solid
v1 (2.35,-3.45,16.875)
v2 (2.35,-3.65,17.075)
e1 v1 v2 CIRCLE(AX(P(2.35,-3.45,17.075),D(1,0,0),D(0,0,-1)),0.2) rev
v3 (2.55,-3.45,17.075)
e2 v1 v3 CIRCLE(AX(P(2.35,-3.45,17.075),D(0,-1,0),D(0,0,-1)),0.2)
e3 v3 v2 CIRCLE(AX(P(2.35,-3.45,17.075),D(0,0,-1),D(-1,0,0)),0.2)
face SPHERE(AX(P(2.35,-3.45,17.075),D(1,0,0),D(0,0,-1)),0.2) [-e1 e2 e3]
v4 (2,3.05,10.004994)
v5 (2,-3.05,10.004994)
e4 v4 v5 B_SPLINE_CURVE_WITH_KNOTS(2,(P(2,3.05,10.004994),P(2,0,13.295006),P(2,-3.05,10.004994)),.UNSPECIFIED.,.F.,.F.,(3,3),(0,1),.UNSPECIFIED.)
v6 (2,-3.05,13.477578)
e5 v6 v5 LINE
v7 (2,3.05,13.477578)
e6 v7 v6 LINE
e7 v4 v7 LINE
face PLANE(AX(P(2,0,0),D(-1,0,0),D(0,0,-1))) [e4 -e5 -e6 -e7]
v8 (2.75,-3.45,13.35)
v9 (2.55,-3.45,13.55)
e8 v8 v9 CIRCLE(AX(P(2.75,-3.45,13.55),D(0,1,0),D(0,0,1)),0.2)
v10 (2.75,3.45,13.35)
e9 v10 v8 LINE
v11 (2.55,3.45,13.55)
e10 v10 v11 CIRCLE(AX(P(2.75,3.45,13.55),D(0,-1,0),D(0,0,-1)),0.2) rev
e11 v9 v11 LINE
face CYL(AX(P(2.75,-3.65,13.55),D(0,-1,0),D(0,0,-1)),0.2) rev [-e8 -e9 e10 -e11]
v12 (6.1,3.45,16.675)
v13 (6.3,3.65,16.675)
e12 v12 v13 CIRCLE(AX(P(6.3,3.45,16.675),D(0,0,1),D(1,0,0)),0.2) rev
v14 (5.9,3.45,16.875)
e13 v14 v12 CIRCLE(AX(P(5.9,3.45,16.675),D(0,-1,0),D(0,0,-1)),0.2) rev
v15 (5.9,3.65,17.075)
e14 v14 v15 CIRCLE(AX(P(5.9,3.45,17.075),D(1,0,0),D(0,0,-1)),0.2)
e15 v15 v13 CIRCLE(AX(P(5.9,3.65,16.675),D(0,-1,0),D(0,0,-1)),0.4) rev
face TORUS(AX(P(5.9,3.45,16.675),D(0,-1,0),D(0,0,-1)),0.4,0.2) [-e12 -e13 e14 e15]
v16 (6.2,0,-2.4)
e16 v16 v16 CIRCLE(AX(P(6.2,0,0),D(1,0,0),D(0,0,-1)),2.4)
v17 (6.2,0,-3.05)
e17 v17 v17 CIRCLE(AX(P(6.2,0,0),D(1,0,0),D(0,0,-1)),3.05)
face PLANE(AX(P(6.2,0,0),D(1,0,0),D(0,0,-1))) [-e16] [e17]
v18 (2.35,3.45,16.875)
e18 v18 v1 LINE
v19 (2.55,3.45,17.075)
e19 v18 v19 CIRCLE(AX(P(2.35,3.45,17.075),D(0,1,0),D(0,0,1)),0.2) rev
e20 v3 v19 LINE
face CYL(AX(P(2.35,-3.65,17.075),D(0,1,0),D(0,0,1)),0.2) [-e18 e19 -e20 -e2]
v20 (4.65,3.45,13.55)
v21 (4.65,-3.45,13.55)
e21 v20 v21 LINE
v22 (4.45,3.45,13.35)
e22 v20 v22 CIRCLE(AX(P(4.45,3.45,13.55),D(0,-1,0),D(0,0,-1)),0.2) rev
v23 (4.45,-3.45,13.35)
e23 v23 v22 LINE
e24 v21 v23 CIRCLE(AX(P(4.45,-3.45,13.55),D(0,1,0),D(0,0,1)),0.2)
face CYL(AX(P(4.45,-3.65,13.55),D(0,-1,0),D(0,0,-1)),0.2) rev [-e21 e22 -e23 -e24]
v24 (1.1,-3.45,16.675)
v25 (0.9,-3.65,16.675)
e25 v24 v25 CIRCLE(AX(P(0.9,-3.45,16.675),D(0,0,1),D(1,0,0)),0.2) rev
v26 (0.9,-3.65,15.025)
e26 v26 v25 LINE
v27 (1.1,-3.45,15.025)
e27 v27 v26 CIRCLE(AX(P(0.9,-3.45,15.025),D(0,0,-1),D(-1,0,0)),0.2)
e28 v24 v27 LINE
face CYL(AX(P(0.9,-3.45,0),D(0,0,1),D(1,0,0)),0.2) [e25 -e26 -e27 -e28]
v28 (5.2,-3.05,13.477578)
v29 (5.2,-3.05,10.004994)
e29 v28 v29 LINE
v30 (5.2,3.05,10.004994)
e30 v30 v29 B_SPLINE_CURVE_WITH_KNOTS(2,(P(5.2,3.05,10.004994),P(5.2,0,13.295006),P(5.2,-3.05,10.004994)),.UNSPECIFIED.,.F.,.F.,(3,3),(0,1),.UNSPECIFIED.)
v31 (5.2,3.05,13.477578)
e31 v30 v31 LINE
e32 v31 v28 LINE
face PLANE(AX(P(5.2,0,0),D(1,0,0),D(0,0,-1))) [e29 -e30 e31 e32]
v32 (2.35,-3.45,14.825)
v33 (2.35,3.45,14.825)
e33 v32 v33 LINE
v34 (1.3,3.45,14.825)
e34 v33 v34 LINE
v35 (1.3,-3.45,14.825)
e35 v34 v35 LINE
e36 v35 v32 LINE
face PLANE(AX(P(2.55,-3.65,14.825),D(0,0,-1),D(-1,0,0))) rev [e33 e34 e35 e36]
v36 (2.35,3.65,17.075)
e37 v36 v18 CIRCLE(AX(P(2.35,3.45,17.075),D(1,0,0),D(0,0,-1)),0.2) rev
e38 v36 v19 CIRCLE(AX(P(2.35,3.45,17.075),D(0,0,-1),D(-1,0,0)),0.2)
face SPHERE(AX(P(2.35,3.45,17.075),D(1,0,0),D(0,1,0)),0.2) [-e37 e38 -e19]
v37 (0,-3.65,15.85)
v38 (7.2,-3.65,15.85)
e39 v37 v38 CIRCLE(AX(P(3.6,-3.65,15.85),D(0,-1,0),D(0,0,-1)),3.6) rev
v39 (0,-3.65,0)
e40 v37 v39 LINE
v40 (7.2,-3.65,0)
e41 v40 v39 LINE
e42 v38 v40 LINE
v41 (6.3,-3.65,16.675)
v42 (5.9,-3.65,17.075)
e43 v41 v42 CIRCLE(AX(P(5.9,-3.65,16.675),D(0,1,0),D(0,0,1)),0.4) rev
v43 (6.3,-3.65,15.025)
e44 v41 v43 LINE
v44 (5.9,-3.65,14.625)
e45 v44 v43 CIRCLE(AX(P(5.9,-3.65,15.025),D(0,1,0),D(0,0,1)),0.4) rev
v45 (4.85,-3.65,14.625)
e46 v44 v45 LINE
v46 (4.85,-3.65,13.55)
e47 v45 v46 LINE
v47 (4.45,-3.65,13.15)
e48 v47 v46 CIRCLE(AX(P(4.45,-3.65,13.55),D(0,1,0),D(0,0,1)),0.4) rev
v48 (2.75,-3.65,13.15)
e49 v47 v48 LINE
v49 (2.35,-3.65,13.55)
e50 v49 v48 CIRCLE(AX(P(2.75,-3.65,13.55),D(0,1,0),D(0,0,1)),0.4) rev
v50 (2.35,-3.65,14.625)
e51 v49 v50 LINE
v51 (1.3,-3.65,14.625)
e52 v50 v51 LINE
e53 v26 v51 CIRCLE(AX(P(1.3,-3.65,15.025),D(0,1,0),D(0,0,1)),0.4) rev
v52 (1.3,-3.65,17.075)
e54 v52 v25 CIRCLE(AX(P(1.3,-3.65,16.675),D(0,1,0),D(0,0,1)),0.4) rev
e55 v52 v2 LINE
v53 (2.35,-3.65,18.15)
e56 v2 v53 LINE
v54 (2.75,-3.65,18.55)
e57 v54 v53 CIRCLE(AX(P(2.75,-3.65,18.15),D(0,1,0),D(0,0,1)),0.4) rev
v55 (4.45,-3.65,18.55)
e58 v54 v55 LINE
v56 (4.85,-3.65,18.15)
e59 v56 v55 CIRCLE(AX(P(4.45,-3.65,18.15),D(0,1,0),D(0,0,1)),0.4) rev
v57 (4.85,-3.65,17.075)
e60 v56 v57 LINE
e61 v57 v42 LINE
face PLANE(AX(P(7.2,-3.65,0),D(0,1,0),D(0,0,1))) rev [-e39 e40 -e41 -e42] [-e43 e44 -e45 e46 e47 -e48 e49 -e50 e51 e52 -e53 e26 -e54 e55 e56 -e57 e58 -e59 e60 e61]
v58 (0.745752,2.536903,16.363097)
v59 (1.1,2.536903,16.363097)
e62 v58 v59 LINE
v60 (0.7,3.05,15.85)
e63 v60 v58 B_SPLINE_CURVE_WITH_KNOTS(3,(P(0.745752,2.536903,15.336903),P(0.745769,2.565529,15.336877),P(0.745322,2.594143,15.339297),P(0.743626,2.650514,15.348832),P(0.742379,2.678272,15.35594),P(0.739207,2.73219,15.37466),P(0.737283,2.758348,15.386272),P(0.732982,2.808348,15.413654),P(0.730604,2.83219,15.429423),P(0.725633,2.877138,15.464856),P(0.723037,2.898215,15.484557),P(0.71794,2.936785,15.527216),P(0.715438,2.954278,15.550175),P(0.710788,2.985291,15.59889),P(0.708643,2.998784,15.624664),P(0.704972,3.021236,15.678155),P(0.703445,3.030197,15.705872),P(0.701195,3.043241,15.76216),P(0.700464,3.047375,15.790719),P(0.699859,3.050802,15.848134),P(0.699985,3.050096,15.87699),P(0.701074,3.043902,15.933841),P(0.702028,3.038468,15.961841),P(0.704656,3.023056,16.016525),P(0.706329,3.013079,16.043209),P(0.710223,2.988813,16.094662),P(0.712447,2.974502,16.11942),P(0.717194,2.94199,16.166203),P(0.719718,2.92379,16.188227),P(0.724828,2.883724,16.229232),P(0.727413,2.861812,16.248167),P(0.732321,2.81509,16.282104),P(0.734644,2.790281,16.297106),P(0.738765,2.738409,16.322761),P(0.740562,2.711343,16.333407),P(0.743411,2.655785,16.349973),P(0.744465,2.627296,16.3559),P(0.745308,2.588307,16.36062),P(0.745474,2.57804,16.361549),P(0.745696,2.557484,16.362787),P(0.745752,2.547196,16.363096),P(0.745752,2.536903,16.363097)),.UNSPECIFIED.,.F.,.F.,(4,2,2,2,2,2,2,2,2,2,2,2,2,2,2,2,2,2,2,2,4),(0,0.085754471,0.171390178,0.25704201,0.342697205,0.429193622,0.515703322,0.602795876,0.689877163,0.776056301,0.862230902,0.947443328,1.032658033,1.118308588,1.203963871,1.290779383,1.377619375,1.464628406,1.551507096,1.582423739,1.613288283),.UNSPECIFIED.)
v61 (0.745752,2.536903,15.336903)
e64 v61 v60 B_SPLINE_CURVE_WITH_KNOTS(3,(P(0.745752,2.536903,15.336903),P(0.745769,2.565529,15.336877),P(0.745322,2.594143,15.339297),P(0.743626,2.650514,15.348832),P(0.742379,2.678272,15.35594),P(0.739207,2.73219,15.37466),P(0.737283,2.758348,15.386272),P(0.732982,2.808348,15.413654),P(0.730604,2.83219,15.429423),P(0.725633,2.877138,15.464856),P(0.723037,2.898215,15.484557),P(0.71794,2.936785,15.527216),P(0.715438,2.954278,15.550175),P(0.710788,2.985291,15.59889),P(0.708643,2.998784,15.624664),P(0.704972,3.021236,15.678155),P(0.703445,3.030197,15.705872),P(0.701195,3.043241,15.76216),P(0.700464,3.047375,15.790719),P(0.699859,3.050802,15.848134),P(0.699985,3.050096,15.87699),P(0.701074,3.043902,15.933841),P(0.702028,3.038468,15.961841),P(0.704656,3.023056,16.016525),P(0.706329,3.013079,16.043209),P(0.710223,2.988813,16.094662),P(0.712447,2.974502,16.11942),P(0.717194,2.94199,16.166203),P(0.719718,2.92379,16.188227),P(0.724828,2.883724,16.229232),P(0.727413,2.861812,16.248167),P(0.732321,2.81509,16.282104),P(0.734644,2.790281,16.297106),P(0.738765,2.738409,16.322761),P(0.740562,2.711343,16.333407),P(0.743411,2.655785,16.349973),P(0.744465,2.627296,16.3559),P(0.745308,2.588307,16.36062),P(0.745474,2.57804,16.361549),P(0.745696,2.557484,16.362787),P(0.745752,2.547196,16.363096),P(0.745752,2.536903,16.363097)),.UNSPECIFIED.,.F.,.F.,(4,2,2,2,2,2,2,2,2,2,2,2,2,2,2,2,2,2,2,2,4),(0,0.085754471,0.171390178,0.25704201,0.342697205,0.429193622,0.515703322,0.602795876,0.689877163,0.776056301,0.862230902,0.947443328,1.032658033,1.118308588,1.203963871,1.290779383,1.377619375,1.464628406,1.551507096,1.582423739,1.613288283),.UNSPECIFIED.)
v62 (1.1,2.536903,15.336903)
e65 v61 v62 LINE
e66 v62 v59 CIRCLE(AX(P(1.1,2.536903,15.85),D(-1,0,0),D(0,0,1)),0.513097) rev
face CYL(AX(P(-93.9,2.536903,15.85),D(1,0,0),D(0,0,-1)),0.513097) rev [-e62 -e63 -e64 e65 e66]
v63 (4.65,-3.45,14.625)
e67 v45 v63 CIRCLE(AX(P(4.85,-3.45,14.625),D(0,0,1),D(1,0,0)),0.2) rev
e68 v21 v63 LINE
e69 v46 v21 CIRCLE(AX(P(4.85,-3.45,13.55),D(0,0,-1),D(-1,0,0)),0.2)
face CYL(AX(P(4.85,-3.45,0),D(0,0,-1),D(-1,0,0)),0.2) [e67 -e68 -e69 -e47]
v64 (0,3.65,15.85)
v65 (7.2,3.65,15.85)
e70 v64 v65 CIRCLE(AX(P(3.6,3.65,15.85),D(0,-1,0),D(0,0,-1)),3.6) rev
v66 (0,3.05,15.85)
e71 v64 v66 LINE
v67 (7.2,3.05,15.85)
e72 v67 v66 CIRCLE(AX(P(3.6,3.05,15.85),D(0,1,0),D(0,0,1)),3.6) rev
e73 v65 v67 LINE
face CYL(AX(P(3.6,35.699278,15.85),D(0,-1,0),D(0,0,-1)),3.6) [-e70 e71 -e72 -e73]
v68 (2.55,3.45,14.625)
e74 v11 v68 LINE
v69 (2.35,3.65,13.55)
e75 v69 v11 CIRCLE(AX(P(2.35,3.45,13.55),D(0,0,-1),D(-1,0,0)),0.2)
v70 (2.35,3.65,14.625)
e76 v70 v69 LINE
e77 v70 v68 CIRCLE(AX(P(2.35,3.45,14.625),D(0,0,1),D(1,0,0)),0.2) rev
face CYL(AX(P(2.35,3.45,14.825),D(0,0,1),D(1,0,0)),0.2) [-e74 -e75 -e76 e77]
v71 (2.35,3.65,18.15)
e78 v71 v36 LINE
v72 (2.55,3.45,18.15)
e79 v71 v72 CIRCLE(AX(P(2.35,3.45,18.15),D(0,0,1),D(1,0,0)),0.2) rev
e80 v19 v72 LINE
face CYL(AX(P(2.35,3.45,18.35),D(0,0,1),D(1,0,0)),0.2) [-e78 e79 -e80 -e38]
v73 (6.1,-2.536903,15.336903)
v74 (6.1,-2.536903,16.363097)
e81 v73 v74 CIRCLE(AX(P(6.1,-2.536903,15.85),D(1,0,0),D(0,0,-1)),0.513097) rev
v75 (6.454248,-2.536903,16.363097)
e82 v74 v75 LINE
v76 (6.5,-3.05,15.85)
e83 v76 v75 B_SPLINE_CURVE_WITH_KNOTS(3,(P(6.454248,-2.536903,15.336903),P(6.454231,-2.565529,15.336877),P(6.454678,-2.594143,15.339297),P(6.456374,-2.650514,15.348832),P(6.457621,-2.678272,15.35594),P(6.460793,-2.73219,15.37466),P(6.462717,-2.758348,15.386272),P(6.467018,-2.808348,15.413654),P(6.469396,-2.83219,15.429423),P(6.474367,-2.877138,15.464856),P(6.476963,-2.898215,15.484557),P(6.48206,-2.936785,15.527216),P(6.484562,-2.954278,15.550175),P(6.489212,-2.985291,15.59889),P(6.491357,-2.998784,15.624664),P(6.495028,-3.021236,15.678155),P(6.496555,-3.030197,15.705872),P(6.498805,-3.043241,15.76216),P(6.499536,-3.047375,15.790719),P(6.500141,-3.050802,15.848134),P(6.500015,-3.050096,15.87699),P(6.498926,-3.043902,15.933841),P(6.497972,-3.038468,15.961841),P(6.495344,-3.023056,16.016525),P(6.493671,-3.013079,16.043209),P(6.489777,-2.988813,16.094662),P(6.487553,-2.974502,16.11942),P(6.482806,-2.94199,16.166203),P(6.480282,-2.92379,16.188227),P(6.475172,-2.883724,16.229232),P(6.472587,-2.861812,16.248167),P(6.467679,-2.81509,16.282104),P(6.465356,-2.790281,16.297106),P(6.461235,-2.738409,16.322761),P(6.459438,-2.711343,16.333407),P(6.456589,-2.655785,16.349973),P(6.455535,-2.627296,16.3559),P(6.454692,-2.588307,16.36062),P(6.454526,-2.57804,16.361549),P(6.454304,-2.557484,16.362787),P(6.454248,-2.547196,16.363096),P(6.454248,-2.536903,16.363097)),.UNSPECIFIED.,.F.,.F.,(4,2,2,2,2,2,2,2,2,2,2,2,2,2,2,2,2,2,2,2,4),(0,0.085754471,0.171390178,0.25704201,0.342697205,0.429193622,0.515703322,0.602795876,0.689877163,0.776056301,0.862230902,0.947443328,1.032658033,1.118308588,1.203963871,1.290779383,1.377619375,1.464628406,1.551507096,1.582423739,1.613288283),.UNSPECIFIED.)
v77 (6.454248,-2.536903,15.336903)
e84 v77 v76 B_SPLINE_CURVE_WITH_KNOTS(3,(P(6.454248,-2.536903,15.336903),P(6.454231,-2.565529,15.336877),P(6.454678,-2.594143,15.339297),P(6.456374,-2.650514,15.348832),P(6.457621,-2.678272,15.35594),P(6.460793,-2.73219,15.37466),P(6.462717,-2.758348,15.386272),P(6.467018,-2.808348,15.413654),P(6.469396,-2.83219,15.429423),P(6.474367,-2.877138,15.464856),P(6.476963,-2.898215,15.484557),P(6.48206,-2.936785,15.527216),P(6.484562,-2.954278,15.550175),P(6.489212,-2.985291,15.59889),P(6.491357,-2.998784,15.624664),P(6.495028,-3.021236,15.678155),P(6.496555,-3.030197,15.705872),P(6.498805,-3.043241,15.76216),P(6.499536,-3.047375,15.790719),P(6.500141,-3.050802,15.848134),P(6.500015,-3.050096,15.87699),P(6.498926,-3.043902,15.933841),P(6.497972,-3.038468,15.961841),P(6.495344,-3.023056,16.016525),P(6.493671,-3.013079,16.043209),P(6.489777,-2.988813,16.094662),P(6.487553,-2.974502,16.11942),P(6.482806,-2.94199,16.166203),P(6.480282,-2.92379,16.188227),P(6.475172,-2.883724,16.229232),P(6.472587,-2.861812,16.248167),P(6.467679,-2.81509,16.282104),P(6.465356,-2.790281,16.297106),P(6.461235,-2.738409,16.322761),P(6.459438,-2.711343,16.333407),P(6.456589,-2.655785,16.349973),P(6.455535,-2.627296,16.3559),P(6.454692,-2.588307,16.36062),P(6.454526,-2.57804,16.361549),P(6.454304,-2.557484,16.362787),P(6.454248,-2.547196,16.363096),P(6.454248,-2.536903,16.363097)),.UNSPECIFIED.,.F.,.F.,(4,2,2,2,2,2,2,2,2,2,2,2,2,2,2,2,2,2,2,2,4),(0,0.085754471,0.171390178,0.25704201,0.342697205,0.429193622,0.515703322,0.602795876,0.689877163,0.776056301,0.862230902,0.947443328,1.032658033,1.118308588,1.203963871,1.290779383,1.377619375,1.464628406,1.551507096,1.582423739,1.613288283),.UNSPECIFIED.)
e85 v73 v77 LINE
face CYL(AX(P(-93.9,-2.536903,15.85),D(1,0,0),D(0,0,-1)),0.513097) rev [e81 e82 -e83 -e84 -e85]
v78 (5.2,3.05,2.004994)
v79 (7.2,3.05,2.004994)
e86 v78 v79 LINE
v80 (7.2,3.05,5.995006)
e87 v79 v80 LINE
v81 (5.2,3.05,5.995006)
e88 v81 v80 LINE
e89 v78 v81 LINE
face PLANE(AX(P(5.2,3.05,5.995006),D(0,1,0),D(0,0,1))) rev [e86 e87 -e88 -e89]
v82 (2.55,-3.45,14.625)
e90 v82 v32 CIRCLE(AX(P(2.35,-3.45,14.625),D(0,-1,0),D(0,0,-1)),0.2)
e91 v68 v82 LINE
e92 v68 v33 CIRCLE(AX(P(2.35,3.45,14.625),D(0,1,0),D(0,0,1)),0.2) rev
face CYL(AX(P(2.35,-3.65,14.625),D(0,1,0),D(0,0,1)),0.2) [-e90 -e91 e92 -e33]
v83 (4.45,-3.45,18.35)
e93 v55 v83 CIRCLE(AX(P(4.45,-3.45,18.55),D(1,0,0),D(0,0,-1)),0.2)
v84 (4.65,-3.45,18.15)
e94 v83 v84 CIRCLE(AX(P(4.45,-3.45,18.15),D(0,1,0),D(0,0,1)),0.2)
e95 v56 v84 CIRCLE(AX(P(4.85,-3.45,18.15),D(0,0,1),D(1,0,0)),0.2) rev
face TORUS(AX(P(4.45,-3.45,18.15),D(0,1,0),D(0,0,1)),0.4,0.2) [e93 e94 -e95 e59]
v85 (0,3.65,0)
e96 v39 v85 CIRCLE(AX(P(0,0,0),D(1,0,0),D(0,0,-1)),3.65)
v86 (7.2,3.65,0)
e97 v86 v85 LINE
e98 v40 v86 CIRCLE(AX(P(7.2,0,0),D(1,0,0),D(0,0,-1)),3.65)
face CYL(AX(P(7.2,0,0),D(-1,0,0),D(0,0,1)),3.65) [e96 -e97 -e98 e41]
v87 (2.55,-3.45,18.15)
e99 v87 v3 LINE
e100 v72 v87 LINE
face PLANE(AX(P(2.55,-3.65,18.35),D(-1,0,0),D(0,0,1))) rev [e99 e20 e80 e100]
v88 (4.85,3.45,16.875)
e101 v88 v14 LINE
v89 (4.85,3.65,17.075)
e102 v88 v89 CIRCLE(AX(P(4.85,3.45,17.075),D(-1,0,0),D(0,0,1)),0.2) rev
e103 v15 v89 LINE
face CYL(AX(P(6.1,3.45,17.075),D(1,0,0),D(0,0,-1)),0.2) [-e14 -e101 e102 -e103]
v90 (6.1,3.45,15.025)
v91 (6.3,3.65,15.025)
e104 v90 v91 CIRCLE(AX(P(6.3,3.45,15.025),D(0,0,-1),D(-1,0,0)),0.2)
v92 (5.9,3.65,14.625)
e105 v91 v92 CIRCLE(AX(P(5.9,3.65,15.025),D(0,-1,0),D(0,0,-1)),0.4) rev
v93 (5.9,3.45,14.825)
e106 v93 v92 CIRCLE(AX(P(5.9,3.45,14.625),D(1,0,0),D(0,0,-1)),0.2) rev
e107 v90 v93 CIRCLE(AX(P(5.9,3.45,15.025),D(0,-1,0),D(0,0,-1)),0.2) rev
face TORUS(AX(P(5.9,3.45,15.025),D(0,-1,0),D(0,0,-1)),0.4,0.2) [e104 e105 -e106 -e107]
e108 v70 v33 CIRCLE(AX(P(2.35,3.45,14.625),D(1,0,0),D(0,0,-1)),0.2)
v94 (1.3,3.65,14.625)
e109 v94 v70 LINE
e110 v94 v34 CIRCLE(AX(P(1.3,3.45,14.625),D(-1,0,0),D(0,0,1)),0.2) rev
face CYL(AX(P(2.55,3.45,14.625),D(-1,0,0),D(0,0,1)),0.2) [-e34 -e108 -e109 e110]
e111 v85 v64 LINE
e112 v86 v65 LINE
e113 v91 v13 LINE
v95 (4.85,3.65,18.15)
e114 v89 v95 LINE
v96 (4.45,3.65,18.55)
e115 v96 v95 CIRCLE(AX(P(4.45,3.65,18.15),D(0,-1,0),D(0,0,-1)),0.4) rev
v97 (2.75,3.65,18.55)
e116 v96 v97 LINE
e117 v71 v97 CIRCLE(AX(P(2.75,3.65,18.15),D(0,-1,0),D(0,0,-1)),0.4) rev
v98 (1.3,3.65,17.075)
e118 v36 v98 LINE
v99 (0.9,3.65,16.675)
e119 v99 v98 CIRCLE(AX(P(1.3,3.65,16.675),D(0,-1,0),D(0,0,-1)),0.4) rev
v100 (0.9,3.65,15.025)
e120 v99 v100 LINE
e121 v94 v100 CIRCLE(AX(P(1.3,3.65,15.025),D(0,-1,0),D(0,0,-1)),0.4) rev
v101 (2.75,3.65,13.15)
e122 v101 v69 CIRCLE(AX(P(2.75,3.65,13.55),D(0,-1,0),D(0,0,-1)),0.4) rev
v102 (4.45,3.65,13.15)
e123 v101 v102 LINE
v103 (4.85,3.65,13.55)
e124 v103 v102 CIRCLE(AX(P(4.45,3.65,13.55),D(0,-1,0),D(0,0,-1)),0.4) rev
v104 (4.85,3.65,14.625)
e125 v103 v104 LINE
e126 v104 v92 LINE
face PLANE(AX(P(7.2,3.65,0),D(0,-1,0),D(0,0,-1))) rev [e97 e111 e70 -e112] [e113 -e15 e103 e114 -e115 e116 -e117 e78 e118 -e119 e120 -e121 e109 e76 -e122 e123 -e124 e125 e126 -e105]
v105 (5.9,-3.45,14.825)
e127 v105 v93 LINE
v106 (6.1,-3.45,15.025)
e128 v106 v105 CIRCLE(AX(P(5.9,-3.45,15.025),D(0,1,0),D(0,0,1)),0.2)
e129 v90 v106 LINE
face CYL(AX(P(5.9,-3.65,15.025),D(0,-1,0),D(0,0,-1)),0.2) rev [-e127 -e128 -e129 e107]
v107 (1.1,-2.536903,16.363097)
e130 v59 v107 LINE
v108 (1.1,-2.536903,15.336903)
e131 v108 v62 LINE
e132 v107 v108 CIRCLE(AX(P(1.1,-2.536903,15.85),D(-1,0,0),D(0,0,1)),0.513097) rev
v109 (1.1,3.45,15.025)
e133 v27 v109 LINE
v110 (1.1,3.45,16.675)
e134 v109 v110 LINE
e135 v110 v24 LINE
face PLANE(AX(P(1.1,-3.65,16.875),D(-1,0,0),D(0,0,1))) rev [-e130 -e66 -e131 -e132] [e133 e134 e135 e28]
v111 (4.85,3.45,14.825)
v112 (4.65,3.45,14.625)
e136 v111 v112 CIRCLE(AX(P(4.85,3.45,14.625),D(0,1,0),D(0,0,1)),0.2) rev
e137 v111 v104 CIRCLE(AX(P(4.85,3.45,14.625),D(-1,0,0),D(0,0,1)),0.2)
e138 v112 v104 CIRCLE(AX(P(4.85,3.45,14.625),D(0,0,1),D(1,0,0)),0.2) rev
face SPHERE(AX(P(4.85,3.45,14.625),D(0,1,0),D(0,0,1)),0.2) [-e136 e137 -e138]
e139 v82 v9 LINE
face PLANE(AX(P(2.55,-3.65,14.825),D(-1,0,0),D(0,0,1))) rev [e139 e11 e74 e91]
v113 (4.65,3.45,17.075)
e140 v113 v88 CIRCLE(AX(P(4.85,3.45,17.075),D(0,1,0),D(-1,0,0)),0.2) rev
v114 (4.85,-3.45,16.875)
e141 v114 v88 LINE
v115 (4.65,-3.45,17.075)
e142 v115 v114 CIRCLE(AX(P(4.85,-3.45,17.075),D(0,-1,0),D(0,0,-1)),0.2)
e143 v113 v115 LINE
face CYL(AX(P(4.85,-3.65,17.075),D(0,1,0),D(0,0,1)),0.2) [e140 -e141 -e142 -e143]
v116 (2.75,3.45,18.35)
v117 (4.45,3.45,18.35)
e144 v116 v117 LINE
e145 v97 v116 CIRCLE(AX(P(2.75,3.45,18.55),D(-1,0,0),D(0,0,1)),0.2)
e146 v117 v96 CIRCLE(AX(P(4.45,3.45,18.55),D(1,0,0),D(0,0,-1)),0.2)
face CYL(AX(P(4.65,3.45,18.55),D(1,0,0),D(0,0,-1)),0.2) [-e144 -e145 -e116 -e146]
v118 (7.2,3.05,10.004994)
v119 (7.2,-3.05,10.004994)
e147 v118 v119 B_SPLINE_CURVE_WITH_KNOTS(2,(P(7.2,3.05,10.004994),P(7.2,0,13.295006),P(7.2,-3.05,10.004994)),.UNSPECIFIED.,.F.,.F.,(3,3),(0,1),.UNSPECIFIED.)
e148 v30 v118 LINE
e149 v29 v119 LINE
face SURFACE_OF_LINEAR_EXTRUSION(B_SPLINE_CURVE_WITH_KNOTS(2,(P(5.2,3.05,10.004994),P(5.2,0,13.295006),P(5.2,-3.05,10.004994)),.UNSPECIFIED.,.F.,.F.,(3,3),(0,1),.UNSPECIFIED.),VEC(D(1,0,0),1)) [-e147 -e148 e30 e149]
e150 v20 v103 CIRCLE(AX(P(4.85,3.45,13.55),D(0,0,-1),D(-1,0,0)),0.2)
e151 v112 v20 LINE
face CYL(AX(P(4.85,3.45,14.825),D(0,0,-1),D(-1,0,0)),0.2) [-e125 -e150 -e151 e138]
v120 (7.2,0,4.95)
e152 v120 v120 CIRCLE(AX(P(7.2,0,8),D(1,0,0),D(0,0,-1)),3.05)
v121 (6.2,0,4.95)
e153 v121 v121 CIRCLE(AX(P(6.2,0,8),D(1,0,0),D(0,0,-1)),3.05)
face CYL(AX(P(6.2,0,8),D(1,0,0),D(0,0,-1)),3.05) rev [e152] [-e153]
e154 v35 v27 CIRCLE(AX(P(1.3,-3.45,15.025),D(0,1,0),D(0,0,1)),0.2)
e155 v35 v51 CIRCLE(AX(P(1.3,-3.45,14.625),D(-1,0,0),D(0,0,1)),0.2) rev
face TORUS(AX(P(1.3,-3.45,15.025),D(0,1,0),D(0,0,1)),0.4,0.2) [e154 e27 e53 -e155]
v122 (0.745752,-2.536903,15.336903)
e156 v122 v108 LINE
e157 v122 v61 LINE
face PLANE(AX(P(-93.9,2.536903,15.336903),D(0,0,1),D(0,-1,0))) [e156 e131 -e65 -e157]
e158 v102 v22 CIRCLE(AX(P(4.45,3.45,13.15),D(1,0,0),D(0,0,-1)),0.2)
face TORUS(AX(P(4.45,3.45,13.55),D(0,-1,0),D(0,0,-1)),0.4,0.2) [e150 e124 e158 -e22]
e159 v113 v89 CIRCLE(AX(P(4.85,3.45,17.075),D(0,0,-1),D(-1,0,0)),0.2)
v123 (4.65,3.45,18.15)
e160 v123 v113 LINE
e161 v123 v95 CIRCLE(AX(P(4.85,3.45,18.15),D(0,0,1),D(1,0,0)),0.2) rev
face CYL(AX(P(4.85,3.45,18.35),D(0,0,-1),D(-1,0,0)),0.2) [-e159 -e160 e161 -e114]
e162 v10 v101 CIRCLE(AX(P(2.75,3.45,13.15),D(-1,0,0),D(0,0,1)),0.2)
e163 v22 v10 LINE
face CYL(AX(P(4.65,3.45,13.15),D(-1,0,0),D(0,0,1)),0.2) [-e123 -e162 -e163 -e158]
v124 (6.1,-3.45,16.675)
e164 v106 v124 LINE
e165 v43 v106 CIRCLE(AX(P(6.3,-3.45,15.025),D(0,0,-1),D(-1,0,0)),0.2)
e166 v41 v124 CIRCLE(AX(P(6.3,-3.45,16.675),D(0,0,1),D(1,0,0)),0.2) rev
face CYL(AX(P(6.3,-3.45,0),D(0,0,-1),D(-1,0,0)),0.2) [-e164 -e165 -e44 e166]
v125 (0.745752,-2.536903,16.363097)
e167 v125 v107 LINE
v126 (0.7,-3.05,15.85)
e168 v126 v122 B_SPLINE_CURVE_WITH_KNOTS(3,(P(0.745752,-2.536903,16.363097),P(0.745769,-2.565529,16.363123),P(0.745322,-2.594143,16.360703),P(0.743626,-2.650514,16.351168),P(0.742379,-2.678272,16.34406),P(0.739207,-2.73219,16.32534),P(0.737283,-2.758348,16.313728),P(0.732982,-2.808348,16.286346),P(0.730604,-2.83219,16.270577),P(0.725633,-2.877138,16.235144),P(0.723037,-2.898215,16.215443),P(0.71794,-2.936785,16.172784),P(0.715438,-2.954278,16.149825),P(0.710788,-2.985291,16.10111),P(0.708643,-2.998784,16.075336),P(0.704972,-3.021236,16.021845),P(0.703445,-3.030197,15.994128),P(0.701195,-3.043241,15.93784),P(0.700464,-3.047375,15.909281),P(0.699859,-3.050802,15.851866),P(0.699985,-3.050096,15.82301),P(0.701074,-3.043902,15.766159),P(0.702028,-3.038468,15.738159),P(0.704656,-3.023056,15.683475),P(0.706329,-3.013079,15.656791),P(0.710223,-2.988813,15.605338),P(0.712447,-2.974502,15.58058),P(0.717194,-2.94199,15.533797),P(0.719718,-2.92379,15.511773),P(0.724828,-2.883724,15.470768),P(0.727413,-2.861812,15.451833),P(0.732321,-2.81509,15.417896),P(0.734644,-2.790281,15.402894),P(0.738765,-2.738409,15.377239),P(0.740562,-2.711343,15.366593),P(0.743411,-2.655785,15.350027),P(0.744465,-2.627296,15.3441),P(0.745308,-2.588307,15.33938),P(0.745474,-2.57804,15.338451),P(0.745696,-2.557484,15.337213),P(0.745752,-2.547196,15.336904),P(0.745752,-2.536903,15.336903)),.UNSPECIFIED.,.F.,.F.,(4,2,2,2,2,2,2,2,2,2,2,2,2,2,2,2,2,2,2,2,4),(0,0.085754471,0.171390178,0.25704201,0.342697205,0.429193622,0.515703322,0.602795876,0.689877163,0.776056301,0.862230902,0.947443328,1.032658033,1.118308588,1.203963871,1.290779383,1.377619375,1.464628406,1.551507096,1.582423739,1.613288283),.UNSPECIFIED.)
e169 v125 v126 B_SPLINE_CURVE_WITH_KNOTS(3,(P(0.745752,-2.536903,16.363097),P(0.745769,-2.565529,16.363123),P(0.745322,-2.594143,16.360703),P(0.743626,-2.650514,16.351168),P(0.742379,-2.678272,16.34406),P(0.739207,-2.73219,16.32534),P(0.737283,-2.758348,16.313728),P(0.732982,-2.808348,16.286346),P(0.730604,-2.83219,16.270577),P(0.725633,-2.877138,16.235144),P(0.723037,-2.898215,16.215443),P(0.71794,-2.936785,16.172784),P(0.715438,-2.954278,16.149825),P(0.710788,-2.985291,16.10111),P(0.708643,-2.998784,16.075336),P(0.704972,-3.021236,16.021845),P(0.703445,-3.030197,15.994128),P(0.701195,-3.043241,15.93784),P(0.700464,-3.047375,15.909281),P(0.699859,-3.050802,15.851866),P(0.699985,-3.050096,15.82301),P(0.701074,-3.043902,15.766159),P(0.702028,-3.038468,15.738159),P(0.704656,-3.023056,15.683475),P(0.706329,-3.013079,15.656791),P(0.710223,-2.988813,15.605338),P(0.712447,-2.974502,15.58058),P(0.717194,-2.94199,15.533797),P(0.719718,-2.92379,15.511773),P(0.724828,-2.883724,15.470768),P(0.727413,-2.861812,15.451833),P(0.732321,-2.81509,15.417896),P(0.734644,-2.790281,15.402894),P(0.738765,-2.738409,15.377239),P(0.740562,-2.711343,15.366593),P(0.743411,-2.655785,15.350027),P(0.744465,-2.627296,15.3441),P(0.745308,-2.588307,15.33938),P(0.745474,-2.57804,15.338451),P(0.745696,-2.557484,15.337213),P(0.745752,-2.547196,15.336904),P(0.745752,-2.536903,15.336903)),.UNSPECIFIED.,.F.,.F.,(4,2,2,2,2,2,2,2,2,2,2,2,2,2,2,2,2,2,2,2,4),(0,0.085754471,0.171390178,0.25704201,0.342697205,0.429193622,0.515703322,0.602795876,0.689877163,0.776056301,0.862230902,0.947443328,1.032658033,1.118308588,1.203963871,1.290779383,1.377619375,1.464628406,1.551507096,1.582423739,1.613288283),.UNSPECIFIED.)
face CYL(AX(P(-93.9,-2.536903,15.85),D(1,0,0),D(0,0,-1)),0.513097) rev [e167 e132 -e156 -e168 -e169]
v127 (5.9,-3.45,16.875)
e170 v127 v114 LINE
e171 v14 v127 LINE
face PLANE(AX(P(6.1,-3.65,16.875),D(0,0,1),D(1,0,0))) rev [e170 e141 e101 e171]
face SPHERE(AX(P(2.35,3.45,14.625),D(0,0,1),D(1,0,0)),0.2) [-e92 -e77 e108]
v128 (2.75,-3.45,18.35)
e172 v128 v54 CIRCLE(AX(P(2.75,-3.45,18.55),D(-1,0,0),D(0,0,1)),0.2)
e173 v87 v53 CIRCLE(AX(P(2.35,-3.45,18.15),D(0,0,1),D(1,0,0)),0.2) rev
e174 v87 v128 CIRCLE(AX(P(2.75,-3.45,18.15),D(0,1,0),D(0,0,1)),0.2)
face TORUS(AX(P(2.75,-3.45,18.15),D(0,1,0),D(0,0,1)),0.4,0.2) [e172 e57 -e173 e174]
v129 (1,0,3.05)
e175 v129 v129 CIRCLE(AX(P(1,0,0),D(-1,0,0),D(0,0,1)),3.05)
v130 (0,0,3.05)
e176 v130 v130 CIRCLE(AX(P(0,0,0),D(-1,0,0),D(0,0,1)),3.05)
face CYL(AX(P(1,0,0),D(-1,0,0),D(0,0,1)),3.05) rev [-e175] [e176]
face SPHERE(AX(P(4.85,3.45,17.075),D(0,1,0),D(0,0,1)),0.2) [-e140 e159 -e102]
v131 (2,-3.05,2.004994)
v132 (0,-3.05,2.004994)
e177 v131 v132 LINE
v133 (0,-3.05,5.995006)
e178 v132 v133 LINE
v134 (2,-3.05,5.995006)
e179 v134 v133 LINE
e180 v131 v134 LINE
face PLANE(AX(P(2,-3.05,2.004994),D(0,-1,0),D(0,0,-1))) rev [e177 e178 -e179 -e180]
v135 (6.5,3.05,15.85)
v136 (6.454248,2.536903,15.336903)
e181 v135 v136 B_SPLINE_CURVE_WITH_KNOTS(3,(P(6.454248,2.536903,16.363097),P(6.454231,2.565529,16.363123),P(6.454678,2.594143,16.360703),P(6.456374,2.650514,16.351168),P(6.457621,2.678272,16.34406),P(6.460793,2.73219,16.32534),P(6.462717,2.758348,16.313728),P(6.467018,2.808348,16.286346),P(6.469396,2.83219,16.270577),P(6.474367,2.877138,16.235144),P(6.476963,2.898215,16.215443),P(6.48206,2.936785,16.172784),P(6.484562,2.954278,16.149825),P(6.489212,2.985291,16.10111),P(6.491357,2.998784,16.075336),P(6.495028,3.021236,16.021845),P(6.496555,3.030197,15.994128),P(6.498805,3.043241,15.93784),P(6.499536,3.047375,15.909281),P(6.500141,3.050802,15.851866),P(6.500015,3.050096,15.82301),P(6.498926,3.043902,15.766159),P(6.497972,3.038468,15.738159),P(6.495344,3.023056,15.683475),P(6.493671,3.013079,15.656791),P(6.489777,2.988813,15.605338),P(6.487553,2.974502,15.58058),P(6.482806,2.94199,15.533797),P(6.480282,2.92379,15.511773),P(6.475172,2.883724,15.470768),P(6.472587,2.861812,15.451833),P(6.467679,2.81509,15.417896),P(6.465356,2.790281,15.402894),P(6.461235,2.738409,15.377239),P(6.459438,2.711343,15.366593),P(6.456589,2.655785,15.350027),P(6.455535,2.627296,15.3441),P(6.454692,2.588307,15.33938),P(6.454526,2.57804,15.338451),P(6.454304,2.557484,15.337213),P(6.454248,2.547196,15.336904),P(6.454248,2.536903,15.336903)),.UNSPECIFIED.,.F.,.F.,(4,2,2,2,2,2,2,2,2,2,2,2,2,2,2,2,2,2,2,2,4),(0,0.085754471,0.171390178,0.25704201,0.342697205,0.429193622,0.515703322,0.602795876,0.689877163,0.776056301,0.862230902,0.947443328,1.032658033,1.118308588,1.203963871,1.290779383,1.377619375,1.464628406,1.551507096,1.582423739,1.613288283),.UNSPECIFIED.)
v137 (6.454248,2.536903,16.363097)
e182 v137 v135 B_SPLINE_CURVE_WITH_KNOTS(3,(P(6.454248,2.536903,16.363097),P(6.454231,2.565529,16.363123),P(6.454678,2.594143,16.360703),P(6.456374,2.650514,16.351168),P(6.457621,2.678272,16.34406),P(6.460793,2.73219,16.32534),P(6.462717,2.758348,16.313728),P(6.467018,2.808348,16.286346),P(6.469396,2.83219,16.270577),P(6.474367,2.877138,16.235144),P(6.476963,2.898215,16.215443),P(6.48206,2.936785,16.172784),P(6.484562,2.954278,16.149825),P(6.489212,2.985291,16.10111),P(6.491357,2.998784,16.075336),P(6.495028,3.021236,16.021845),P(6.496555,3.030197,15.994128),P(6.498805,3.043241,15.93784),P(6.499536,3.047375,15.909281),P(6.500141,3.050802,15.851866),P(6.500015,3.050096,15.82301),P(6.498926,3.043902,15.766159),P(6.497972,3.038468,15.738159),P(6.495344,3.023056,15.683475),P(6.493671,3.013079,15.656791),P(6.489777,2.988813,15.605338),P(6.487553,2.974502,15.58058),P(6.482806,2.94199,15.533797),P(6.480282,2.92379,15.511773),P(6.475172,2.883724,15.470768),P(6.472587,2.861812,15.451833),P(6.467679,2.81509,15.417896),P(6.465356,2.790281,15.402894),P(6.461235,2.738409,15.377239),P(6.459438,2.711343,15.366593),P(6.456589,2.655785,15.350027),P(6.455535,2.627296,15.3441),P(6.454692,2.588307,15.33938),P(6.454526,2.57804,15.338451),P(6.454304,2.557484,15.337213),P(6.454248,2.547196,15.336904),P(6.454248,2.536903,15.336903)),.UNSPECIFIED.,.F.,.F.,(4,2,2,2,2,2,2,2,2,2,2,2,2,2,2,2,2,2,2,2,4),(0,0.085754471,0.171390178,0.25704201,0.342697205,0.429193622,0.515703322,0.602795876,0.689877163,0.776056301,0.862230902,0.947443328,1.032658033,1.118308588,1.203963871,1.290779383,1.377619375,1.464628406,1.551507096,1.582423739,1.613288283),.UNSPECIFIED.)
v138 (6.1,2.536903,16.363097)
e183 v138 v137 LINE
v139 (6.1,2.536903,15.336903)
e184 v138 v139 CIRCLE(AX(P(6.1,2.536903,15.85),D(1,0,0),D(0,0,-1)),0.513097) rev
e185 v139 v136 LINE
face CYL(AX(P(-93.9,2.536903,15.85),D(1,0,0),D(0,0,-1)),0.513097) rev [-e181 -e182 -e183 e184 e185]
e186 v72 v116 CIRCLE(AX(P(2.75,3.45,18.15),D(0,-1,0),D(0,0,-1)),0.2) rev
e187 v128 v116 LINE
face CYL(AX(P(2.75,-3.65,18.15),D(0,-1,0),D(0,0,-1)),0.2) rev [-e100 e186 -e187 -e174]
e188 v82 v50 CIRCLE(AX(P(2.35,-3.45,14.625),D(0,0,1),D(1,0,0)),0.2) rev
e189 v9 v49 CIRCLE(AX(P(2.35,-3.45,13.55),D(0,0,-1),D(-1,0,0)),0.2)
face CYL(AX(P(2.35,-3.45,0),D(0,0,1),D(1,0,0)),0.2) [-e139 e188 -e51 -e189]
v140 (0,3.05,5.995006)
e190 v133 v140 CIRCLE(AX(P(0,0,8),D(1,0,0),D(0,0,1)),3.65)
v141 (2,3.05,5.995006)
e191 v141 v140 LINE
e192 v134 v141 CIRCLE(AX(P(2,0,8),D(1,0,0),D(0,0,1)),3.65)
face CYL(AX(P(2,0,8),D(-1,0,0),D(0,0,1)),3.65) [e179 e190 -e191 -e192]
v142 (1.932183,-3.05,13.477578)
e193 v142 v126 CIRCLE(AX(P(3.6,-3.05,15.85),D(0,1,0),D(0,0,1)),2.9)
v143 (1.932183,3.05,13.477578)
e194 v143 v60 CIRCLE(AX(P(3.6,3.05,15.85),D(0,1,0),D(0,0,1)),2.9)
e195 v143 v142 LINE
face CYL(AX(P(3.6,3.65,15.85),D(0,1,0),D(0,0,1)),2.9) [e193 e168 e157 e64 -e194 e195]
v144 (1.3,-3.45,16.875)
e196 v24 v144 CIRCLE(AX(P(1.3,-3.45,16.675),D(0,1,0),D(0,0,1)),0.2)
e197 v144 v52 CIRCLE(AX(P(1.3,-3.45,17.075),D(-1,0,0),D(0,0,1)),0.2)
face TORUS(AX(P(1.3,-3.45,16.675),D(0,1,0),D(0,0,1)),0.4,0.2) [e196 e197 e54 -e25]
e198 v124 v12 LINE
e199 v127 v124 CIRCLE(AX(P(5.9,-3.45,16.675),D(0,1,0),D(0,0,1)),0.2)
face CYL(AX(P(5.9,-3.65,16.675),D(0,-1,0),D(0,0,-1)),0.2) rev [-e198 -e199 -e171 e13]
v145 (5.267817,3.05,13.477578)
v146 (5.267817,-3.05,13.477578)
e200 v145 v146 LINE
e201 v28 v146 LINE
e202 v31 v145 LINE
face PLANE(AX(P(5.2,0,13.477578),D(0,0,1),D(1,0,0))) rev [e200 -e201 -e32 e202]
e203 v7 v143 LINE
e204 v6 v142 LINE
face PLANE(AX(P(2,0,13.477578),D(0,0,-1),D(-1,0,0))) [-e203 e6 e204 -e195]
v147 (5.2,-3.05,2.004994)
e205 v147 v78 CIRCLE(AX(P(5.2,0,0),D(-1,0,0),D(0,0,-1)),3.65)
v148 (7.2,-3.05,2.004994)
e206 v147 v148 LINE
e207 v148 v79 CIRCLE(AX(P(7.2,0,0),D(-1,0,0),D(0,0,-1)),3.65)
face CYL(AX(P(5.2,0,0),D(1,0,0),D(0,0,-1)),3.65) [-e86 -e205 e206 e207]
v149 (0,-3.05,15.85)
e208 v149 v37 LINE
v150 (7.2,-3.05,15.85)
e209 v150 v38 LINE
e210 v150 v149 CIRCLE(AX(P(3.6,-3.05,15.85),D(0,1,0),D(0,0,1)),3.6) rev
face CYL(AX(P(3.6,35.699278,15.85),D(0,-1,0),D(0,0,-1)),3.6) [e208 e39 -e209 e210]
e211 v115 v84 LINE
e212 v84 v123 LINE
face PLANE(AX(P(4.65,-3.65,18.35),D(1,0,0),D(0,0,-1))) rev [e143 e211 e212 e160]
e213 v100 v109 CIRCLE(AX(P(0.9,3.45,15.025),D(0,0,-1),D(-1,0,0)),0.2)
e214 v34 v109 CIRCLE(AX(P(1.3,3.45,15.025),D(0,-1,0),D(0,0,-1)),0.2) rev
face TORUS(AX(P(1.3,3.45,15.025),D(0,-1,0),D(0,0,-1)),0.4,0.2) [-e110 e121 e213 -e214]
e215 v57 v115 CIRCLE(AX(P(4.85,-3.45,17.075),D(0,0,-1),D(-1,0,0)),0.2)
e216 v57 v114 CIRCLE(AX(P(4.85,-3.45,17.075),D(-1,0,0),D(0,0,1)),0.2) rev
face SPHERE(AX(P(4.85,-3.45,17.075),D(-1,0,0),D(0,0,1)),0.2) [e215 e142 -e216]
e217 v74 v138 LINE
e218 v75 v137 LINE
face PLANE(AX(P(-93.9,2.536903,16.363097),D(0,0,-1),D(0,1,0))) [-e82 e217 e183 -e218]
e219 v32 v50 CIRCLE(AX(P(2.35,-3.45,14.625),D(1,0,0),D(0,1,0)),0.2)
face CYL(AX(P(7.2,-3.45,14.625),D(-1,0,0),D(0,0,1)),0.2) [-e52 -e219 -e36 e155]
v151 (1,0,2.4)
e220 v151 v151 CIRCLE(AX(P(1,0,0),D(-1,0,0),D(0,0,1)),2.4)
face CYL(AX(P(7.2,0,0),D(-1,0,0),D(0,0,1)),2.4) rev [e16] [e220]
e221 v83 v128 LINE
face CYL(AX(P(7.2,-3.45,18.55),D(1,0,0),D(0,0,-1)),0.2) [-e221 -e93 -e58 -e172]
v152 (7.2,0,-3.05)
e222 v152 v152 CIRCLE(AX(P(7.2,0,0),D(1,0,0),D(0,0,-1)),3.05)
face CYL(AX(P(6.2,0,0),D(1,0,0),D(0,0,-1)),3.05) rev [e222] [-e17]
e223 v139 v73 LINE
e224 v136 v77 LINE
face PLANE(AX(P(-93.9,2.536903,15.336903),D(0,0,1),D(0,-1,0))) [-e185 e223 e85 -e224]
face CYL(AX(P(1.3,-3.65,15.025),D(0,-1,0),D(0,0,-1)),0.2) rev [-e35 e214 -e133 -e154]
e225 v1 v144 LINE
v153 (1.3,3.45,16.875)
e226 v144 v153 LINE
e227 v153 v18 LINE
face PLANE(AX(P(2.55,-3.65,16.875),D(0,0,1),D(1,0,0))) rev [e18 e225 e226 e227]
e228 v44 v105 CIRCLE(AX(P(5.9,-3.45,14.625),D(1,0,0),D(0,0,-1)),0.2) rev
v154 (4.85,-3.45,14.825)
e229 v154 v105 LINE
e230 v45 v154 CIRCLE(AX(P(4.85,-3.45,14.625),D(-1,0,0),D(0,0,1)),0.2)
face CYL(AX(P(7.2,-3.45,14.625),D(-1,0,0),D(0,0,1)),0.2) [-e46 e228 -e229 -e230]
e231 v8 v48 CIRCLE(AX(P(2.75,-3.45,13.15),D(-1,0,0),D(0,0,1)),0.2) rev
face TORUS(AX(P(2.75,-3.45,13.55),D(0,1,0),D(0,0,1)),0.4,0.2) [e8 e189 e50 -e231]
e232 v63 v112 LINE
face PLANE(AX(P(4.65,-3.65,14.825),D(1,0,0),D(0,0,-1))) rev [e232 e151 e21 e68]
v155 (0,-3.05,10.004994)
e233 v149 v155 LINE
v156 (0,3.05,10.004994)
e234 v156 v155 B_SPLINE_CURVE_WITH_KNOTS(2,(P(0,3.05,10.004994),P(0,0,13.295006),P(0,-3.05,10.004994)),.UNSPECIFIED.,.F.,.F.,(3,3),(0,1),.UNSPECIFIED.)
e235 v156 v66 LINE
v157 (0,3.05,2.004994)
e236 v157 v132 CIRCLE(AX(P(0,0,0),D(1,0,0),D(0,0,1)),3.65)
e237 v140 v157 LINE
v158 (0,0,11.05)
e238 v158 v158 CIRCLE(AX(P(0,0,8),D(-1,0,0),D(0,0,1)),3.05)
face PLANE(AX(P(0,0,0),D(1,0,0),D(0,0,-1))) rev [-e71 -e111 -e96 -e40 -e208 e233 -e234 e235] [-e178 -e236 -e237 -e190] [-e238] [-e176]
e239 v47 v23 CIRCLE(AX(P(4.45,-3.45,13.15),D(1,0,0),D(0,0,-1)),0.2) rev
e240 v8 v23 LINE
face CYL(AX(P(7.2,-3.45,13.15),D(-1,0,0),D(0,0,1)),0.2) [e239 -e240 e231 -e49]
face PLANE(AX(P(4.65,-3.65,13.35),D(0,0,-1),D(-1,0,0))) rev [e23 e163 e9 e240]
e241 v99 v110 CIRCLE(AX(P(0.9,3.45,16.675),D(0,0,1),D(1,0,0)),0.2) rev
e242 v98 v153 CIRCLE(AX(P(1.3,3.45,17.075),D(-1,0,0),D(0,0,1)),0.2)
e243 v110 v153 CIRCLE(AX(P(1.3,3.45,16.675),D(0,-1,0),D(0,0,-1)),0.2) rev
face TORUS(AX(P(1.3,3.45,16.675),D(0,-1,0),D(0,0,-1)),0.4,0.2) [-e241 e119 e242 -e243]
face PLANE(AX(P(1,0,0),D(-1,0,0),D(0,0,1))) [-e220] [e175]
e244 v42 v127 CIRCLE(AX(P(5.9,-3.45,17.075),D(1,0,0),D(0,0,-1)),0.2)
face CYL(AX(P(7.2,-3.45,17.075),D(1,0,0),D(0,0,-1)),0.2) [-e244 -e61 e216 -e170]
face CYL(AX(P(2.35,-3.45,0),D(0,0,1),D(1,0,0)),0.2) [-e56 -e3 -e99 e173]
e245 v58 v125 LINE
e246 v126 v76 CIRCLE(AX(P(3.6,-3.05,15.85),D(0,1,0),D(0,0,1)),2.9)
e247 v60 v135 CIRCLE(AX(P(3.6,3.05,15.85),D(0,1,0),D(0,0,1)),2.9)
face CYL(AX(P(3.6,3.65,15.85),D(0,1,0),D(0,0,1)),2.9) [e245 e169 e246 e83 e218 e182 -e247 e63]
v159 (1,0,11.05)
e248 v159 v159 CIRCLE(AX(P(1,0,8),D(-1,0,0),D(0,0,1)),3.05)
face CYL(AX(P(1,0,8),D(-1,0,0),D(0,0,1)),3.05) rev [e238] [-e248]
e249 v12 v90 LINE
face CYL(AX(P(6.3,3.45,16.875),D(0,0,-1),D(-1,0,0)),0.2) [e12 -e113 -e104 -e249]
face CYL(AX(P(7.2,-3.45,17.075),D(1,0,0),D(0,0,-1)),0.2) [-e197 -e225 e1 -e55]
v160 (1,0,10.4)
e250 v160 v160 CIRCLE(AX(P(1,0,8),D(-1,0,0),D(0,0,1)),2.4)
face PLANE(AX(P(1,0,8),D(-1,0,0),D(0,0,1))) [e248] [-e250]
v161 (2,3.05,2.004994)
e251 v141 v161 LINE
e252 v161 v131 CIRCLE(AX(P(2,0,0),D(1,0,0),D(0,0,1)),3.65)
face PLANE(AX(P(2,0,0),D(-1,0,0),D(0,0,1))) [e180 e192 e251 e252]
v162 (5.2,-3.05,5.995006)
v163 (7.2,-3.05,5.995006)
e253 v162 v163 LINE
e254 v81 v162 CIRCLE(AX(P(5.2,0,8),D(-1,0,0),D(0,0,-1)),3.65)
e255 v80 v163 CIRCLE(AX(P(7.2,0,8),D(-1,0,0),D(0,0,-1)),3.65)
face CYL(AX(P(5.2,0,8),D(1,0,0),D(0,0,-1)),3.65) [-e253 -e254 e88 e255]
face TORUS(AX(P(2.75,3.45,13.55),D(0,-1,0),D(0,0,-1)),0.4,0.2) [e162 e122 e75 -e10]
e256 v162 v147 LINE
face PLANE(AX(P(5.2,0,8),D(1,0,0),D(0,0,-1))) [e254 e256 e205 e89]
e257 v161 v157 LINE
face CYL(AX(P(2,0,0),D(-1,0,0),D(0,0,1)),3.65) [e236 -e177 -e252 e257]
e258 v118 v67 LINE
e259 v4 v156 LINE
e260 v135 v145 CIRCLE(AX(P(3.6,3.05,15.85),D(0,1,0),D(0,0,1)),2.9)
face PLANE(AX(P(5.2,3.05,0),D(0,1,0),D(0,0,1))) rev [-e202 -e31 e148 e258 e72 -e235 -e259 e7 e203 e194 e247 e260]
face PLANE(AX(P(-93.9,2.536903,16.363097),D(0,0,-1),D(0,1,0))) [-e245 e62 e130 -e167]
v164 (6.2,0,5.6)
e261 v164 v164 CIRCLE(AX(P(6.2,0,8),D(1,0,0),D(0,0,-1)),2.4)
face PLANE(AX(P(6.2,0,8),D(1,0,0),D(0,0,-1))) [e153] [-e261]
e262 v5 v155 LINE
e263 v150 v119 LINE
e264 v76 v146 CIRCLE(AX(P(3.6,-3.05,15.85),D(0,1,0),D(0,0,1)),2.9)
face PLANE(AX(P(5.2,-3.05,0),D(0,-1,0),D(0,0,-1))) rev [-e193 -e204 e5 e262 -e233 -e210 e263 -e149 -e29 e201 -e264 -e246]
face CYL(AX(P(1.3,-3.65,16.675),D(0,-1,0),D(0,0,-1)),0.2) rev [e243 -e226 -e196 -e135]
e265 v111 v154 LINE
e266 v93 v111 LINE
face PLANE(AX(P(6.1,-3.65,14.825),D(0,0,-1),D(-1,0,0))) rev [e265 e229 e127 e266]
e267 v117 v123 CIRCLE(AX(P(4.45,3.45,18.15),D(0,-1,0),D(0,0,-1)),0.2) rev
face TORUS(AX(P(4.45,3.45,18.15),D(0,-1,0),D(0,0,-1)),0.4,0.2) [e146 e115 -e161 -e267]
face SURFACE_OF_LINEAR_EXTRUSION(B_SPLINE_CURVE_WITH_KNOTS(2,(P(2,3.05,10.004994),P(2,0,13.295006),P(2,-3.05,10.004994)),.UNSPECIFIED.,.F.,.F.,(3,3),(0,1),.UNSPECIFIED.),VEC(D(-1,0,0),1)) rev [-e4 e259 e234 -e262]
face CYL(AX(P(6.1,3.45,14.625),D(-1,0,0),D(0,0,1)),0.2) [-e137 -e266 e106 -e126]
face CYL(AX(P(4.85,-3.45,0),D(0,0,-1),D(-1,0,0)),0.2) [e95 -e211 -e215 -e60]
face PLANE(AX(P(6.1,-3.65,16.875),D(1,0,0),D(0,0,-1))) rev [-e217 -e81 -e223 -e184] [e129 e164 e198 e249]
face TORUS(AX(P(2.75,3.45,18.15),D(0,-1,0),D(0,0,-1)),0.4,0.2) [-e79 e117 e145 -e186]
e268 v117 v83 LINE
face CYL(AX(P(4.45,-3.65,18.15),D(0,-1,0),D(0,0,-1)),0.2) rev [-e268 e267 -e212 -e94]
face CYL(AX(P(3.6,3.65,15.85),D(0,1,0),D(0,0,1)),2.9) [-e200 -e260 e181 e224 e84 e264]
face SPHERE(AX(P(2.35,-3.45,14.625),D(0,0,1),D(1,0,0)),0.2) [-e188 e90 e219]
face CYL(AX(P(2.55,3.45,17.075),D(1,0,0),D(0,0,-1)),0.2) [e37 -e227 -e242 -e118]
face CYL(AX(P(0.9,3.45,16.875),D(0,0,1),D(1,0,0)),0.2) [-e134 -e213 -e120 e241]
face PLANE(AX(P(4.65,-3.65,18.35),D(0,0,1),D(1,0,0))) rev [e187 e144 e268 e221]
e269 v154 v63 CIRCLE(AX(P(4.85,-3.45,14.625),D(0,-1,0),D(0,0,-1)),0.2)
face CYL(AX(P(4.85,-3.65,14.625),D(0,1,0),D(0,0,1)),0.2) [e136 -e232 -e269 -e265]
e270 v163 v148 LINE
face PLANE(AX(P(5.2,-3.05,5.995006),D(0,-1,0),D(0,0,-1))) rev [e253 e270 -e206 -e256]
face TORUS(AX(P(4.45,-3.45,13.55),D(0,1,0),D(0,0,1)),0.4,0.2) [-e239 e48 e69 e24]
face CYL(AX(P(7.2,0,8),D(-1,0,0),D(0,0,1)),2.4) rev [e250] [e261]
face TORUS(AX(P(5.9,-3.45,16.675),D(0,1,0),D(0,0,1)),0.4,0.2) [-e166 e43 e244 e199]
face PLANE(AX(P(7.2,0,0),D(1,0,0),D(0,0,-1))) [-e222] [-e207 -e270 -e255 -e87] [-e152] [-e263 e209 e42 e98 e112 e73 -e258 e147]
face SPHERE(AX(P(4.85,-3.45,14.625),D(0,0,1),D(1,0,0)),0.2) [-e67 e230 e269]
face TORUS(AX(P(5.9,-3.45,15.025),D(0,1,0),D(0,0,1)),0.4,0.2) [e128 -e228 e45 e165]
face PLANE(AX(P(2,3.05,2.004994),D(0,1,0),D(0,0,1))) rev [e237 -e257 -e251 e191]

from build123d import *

# Parameters (mm, degrees)
SKETCH2_R           = 2.4
BOSS_EXTRUDE1_DEPTH = 7.2
CUT_EXTRUDE1_DEPTH  = 23.341721062
CUT_EXTRUDE2_START  = -7.3
CUT_EXTRUDE2_DEPTH  = 7.3
SKETCH5_R           = 3.05
CUT_EXTRUDE3_DEPTH  = 1
CUT_EXTRUDE4_START  = -1
SKETCH6_R           = 3.05
CUT_EXTRUDE4_DEPTH  = 1
CUT_EXTRUDE5_START  = -2
CUT_EXTRUDE5_DEPTH  = 2
CUT_EXTRUDE6_DEPTH  = 2
CUT_EXTRUDE10_DEPTH = 2
SKETCH13_W          = 1.9505477
SKETCH13_H          = 6.1
CUT_REVOLVE2_ANGLE  = 180
SKETCH13_3_W        = 1.9505477
SKETCH13_3_H        = 6.1
CUT_REVOLVE3_ANGLE  = 55
CUT_EXTRUDE11_DEPTH = 100
FILLET1_R           = 0.2


# Read off the part's stored shape, not the designer's step: Cut-Extrude2
with BuildPart() as part:
    # Sketch2 → Boss-Extrude1 (new body)
    with BuildSketch(Plane(origin=(0, 0, 0), x_dir=(0, 0, -1), z_dir=(1, 0, 0))):
        with BuildLine():
            Line((0, -3.65), (-19.85, -3.65))
            Line((-19.85, -3.65), (-19.85, 3.65))
            Line((-19.85, 3.65), (0, 3.65))
            ThreePointArc((0, 3.65), (3.65, 0), (0, -3.65))
        make_face()
        Circle(SKETCH2_R, mode=Mode.SUBTRACT)
        with Locations((-8, 0)):
            Circle(SKETCH2_R, mode=Mode.SUBTRACT)
    extrude(amount=BOSS_EXTRUDE1_DEPTH)

    # Sketch3 → Cut-Extrude1 (cut, through all)
    with BuildSketch(Plane(origin=(0, 3.65, 0), x_dir=(1, 0, 0), z_dir=(0, 1, 0))):
        Polygon((2.55, -14.825), (1.1, -14.825), (1.1, -16.875), (2.55, -16.875), (2.55, -18.35), (4.65, -18.35), (4.65, -16.875), (6.1, -16.875), (6.1, -14.825), (4.65, -14.825), (4.65, -13.35), (2.55, -13.35), align=None)
    extrude(amount=-CUT_EXTRUDE1_DEPTH, mode=Mode.SUBTRACT)

    # Cut-Extrude2 outline → Cut-Extrude2 (cut)
    with BuildSketch(Plane(origin=(0, 3.65, 0), x_dir=(1, 0, 0), z_dir=(0, 1, 0)).offset(CUT_EXTRUDE2_START)):
        with BuildLine():
            Line((7.2, -19.85), (7.2, -15.85))
            ThreePointArc((7.2, -15.85), (3.6, -19.45), (0, -15.85))
            Line((0, -15.85), (0, -19.85))
            Line((0, -19.85), (7.2, -19.85))
        make_face()
    extrude(amount=CUT_EXTRUDE2_DEPTH, mode=Mode.SUBTRACT)

    # Sketch5 → Cut-Extrude3 (cut)
    with BuildSketch(Plane(origin=(7.2, 0, 0), x_dir=(0, 0, -1), z_dir=(1, 0, 0))):
        with Locations((-8, 0)):
            Circle(SKETCH5_R)
        Circle(SKETCH5_R)
    extrude(amount=-CUT_EXTRUDE3_DEPTH, mode=Mode.SUBTRACT)

    # Sketch6 → Cut-Extrude4 (cut)
    with BuildSketch(Plane.ZY.offset(CUT_EXTRUDE4_START)):
        with Locations(Location((0, 0, 0), (0, 0, 180))):
            Circle(SKETCH6_R)
        with Locations(Location((8, 0, 0), (0, 0, 180))):
            Circle(SKETCH6_R)
    extrude(amount=CUT_EXTRUDE4_DEPTH, mode=Mode.SUBTRACT)

    # Sketch8 → Cut-Extrude5 (cut)
    with BuildSketch(Plane(origin=(7.2, 0, 0), x_dir=(0, 0, -1), z_dir=(1, 0, 0)).offset(CUT_EXTRUDE5_START)):
        with BuildLine():
            Line((-5.995006234, 3.05), (-2.004993766, 3.05))
            ThreePointArc((-2.004993766, 3.05), (-3.65, 0), (-2.004993766, -3.05))
            Line((-2.004993766, -3.05), (-5.995006234, -3.05))
            ThreePointArc((-5.995006234, -3.05), (-4.35, 0), (-5.995006234, 3.05))
        make_face()
    extrude(amount=CUT_EXTRUDE5_DEPTH, mode=Mode.SUBTRACT)

    # Sketch9 → Cut-Extrude6 (cut)
    with BuildSketch(Plane.ZY):
        with BuildLine():
            Line((2.004993766, 3.05), (5.995006234, 3.05))
            ThreePointArc((5.995006234, 3.05), (4.35, 0), (5.995006234, -3.05))
            Line((5.995006234, -3.05), (2.004993766, -3.05))
            ThreePointArc((2.004993766, -3.05), (3.65, 0), (2.004993766, 3.05))
        make_face()
    extrude(amount=-CUT_EXTRUDE6_DEPTH, mode=Mode.SUBTRACT)

    # Sketch15 → Cut-Extrude10 (cut)
    with BuildSketch(Plane(origin=(7.2, 0, 0), x_dir=(0, 0, -1), z_dir=(1, 0, 0))):
        with BuildLine():
            add(Edge.make_bspline(
                [(-10.004993766, 3.05), (-13.295006234, 0), (-10.004993766, -3.05)],
                knots=[0, 0, 0, 1, 1, 1], degree=2))
            Line((-10.004993766, -3.05), (-13.477577885, -3.05))
            Line((-13.477577885, -3.05), (-13.477577885, 3.05))
            Line((-13.477577885, 3.05), (-10.004993766, 3.05))
        make_face()
    cut_extrude10 = extrude(amount=-CUT_EXTRUDE10_DEPTH, mode=Mode.SUBTRACT)

    # Sketch13 → Cut-Revolve2 (revolve, cut)
    with BuildSketch(Plane.XY.offset(15.85)):
        with Locations((7.47527385, 0)):
            Rectangle(SKETCH13_W, SKETCH13_H)
    revolve(axis=Axis((3.6, 3.65, 15.85), (0, -1, 0)), revolution_arc=CUT_REVOLVE2_ANGLE, mode=Mode.SUBTRACT)

    # Sketch13<3> → Cut-Revolve3 (revolve, cut)
    with BuildSketch(Plane.XY.offset(15.85)):
        with Locations((7.47527385, 0)):
            Rectangle(SKETCH13_3_W, SKETCH13_3_H)
    cut_revolve3 = revolve(axis=Axis((3.6, 3.65, 15.85), (0, 1, 0)), revolution_arc=CUT_REVOLVE3_ANGLE, mode=Mode.SUBTRACT)

    # Mirror2: Cut-Revolve3 across plane
    add(cut_revolve3.mirror(Plane.ZY.offset(-3.6)), mode=Mode.SUBTRACT)

    # Mirror3: Cut-Extrude10 across plane
    add(cut_extrude10.mirror(Plane.ZY.offset(-3.6)), mode=Mode.SUBTRACT)

    # Sketch16 → Cut-Extrude11 (cut, symmetric)
    with BuildSketch(Plane.ZY.offset(-6.1)):
        with BuildLine():
            Line((16.36309696, 2.53690304), (16.36309696, -2.53690304))
            ThreePointArc((16.36309696, -2.53690304), (15.85, -3.05), (15.33690304, -2.53690304))
            Line((15.33690304, -2.53690304), (15.33690304, 2.53690304))
            ThreePointArc((15.33690304, 2.53690304), (15.85, 3.05), (16.36309696, 2.53690304))
        make_face()
    extrude(amount=CUT_EXTRUDE11_DEPTH, both=True, mode=Mode.SUBTRACT)

    # Fillet1
    fillet1_edges = [part.edges().sort_by_distance(p)[0] for p in [
        (2.55, -3.65, 14.0875),
        (2.55, 0, 14.825),
        (3.6, -3.65, 13.35),
        (2.55, 0, 13.35),
        (4.65, -3.65, 14.0875),
        (4.65, 0, 13.35),
        (5.375, -3.65, 14.825),
        (4.65, 0, 14.825),
        (6.1, -3.65, 15.85),
        (6.1, 0, 14.825),
        (5.375, -3.65, 16.875),
        (6.1, 0, 16.875),
        (4.65, -3.65, 17.6125),
        (4.65, 0, 16.875),
        (3.6, -3.65, 18.35),
        (4.65, 0, 18.35),
        (2.55, -3.65, 17.6125),
        (2.55, 0, 18.35),
        (1.825, -3.65, 16.875),
        (2.55, 0, 16.875),
        (1.1, -3.65, 15.85),
        (1.1, 0, 16.875),
        (1.825, -3.65, 14.825),
        (1.1, 0, 14.825),
        (2.55, 3.65, 14.0875),
        (1.825, 3.65, 14.825),
        (1.1, 3.65, 15.85),
        (1.825, 3.65, 16.875),
        (2.55, 3.65, 17.6125),
        (3.6, 3.65, 18.35),
        (4.65, 3.65, 17.6125),
        (5.375, 3.65, 16.875),
        (6.1, 3.65, 15.85),
        (5.375, 3.65, 14.825),
        (4.65, 3.65, 14.0875),
        (3.6, 3.65, 13.35),
    ]]
    fillet(fillet1_edges, radius=FILLET1_R)


solid = part.part
